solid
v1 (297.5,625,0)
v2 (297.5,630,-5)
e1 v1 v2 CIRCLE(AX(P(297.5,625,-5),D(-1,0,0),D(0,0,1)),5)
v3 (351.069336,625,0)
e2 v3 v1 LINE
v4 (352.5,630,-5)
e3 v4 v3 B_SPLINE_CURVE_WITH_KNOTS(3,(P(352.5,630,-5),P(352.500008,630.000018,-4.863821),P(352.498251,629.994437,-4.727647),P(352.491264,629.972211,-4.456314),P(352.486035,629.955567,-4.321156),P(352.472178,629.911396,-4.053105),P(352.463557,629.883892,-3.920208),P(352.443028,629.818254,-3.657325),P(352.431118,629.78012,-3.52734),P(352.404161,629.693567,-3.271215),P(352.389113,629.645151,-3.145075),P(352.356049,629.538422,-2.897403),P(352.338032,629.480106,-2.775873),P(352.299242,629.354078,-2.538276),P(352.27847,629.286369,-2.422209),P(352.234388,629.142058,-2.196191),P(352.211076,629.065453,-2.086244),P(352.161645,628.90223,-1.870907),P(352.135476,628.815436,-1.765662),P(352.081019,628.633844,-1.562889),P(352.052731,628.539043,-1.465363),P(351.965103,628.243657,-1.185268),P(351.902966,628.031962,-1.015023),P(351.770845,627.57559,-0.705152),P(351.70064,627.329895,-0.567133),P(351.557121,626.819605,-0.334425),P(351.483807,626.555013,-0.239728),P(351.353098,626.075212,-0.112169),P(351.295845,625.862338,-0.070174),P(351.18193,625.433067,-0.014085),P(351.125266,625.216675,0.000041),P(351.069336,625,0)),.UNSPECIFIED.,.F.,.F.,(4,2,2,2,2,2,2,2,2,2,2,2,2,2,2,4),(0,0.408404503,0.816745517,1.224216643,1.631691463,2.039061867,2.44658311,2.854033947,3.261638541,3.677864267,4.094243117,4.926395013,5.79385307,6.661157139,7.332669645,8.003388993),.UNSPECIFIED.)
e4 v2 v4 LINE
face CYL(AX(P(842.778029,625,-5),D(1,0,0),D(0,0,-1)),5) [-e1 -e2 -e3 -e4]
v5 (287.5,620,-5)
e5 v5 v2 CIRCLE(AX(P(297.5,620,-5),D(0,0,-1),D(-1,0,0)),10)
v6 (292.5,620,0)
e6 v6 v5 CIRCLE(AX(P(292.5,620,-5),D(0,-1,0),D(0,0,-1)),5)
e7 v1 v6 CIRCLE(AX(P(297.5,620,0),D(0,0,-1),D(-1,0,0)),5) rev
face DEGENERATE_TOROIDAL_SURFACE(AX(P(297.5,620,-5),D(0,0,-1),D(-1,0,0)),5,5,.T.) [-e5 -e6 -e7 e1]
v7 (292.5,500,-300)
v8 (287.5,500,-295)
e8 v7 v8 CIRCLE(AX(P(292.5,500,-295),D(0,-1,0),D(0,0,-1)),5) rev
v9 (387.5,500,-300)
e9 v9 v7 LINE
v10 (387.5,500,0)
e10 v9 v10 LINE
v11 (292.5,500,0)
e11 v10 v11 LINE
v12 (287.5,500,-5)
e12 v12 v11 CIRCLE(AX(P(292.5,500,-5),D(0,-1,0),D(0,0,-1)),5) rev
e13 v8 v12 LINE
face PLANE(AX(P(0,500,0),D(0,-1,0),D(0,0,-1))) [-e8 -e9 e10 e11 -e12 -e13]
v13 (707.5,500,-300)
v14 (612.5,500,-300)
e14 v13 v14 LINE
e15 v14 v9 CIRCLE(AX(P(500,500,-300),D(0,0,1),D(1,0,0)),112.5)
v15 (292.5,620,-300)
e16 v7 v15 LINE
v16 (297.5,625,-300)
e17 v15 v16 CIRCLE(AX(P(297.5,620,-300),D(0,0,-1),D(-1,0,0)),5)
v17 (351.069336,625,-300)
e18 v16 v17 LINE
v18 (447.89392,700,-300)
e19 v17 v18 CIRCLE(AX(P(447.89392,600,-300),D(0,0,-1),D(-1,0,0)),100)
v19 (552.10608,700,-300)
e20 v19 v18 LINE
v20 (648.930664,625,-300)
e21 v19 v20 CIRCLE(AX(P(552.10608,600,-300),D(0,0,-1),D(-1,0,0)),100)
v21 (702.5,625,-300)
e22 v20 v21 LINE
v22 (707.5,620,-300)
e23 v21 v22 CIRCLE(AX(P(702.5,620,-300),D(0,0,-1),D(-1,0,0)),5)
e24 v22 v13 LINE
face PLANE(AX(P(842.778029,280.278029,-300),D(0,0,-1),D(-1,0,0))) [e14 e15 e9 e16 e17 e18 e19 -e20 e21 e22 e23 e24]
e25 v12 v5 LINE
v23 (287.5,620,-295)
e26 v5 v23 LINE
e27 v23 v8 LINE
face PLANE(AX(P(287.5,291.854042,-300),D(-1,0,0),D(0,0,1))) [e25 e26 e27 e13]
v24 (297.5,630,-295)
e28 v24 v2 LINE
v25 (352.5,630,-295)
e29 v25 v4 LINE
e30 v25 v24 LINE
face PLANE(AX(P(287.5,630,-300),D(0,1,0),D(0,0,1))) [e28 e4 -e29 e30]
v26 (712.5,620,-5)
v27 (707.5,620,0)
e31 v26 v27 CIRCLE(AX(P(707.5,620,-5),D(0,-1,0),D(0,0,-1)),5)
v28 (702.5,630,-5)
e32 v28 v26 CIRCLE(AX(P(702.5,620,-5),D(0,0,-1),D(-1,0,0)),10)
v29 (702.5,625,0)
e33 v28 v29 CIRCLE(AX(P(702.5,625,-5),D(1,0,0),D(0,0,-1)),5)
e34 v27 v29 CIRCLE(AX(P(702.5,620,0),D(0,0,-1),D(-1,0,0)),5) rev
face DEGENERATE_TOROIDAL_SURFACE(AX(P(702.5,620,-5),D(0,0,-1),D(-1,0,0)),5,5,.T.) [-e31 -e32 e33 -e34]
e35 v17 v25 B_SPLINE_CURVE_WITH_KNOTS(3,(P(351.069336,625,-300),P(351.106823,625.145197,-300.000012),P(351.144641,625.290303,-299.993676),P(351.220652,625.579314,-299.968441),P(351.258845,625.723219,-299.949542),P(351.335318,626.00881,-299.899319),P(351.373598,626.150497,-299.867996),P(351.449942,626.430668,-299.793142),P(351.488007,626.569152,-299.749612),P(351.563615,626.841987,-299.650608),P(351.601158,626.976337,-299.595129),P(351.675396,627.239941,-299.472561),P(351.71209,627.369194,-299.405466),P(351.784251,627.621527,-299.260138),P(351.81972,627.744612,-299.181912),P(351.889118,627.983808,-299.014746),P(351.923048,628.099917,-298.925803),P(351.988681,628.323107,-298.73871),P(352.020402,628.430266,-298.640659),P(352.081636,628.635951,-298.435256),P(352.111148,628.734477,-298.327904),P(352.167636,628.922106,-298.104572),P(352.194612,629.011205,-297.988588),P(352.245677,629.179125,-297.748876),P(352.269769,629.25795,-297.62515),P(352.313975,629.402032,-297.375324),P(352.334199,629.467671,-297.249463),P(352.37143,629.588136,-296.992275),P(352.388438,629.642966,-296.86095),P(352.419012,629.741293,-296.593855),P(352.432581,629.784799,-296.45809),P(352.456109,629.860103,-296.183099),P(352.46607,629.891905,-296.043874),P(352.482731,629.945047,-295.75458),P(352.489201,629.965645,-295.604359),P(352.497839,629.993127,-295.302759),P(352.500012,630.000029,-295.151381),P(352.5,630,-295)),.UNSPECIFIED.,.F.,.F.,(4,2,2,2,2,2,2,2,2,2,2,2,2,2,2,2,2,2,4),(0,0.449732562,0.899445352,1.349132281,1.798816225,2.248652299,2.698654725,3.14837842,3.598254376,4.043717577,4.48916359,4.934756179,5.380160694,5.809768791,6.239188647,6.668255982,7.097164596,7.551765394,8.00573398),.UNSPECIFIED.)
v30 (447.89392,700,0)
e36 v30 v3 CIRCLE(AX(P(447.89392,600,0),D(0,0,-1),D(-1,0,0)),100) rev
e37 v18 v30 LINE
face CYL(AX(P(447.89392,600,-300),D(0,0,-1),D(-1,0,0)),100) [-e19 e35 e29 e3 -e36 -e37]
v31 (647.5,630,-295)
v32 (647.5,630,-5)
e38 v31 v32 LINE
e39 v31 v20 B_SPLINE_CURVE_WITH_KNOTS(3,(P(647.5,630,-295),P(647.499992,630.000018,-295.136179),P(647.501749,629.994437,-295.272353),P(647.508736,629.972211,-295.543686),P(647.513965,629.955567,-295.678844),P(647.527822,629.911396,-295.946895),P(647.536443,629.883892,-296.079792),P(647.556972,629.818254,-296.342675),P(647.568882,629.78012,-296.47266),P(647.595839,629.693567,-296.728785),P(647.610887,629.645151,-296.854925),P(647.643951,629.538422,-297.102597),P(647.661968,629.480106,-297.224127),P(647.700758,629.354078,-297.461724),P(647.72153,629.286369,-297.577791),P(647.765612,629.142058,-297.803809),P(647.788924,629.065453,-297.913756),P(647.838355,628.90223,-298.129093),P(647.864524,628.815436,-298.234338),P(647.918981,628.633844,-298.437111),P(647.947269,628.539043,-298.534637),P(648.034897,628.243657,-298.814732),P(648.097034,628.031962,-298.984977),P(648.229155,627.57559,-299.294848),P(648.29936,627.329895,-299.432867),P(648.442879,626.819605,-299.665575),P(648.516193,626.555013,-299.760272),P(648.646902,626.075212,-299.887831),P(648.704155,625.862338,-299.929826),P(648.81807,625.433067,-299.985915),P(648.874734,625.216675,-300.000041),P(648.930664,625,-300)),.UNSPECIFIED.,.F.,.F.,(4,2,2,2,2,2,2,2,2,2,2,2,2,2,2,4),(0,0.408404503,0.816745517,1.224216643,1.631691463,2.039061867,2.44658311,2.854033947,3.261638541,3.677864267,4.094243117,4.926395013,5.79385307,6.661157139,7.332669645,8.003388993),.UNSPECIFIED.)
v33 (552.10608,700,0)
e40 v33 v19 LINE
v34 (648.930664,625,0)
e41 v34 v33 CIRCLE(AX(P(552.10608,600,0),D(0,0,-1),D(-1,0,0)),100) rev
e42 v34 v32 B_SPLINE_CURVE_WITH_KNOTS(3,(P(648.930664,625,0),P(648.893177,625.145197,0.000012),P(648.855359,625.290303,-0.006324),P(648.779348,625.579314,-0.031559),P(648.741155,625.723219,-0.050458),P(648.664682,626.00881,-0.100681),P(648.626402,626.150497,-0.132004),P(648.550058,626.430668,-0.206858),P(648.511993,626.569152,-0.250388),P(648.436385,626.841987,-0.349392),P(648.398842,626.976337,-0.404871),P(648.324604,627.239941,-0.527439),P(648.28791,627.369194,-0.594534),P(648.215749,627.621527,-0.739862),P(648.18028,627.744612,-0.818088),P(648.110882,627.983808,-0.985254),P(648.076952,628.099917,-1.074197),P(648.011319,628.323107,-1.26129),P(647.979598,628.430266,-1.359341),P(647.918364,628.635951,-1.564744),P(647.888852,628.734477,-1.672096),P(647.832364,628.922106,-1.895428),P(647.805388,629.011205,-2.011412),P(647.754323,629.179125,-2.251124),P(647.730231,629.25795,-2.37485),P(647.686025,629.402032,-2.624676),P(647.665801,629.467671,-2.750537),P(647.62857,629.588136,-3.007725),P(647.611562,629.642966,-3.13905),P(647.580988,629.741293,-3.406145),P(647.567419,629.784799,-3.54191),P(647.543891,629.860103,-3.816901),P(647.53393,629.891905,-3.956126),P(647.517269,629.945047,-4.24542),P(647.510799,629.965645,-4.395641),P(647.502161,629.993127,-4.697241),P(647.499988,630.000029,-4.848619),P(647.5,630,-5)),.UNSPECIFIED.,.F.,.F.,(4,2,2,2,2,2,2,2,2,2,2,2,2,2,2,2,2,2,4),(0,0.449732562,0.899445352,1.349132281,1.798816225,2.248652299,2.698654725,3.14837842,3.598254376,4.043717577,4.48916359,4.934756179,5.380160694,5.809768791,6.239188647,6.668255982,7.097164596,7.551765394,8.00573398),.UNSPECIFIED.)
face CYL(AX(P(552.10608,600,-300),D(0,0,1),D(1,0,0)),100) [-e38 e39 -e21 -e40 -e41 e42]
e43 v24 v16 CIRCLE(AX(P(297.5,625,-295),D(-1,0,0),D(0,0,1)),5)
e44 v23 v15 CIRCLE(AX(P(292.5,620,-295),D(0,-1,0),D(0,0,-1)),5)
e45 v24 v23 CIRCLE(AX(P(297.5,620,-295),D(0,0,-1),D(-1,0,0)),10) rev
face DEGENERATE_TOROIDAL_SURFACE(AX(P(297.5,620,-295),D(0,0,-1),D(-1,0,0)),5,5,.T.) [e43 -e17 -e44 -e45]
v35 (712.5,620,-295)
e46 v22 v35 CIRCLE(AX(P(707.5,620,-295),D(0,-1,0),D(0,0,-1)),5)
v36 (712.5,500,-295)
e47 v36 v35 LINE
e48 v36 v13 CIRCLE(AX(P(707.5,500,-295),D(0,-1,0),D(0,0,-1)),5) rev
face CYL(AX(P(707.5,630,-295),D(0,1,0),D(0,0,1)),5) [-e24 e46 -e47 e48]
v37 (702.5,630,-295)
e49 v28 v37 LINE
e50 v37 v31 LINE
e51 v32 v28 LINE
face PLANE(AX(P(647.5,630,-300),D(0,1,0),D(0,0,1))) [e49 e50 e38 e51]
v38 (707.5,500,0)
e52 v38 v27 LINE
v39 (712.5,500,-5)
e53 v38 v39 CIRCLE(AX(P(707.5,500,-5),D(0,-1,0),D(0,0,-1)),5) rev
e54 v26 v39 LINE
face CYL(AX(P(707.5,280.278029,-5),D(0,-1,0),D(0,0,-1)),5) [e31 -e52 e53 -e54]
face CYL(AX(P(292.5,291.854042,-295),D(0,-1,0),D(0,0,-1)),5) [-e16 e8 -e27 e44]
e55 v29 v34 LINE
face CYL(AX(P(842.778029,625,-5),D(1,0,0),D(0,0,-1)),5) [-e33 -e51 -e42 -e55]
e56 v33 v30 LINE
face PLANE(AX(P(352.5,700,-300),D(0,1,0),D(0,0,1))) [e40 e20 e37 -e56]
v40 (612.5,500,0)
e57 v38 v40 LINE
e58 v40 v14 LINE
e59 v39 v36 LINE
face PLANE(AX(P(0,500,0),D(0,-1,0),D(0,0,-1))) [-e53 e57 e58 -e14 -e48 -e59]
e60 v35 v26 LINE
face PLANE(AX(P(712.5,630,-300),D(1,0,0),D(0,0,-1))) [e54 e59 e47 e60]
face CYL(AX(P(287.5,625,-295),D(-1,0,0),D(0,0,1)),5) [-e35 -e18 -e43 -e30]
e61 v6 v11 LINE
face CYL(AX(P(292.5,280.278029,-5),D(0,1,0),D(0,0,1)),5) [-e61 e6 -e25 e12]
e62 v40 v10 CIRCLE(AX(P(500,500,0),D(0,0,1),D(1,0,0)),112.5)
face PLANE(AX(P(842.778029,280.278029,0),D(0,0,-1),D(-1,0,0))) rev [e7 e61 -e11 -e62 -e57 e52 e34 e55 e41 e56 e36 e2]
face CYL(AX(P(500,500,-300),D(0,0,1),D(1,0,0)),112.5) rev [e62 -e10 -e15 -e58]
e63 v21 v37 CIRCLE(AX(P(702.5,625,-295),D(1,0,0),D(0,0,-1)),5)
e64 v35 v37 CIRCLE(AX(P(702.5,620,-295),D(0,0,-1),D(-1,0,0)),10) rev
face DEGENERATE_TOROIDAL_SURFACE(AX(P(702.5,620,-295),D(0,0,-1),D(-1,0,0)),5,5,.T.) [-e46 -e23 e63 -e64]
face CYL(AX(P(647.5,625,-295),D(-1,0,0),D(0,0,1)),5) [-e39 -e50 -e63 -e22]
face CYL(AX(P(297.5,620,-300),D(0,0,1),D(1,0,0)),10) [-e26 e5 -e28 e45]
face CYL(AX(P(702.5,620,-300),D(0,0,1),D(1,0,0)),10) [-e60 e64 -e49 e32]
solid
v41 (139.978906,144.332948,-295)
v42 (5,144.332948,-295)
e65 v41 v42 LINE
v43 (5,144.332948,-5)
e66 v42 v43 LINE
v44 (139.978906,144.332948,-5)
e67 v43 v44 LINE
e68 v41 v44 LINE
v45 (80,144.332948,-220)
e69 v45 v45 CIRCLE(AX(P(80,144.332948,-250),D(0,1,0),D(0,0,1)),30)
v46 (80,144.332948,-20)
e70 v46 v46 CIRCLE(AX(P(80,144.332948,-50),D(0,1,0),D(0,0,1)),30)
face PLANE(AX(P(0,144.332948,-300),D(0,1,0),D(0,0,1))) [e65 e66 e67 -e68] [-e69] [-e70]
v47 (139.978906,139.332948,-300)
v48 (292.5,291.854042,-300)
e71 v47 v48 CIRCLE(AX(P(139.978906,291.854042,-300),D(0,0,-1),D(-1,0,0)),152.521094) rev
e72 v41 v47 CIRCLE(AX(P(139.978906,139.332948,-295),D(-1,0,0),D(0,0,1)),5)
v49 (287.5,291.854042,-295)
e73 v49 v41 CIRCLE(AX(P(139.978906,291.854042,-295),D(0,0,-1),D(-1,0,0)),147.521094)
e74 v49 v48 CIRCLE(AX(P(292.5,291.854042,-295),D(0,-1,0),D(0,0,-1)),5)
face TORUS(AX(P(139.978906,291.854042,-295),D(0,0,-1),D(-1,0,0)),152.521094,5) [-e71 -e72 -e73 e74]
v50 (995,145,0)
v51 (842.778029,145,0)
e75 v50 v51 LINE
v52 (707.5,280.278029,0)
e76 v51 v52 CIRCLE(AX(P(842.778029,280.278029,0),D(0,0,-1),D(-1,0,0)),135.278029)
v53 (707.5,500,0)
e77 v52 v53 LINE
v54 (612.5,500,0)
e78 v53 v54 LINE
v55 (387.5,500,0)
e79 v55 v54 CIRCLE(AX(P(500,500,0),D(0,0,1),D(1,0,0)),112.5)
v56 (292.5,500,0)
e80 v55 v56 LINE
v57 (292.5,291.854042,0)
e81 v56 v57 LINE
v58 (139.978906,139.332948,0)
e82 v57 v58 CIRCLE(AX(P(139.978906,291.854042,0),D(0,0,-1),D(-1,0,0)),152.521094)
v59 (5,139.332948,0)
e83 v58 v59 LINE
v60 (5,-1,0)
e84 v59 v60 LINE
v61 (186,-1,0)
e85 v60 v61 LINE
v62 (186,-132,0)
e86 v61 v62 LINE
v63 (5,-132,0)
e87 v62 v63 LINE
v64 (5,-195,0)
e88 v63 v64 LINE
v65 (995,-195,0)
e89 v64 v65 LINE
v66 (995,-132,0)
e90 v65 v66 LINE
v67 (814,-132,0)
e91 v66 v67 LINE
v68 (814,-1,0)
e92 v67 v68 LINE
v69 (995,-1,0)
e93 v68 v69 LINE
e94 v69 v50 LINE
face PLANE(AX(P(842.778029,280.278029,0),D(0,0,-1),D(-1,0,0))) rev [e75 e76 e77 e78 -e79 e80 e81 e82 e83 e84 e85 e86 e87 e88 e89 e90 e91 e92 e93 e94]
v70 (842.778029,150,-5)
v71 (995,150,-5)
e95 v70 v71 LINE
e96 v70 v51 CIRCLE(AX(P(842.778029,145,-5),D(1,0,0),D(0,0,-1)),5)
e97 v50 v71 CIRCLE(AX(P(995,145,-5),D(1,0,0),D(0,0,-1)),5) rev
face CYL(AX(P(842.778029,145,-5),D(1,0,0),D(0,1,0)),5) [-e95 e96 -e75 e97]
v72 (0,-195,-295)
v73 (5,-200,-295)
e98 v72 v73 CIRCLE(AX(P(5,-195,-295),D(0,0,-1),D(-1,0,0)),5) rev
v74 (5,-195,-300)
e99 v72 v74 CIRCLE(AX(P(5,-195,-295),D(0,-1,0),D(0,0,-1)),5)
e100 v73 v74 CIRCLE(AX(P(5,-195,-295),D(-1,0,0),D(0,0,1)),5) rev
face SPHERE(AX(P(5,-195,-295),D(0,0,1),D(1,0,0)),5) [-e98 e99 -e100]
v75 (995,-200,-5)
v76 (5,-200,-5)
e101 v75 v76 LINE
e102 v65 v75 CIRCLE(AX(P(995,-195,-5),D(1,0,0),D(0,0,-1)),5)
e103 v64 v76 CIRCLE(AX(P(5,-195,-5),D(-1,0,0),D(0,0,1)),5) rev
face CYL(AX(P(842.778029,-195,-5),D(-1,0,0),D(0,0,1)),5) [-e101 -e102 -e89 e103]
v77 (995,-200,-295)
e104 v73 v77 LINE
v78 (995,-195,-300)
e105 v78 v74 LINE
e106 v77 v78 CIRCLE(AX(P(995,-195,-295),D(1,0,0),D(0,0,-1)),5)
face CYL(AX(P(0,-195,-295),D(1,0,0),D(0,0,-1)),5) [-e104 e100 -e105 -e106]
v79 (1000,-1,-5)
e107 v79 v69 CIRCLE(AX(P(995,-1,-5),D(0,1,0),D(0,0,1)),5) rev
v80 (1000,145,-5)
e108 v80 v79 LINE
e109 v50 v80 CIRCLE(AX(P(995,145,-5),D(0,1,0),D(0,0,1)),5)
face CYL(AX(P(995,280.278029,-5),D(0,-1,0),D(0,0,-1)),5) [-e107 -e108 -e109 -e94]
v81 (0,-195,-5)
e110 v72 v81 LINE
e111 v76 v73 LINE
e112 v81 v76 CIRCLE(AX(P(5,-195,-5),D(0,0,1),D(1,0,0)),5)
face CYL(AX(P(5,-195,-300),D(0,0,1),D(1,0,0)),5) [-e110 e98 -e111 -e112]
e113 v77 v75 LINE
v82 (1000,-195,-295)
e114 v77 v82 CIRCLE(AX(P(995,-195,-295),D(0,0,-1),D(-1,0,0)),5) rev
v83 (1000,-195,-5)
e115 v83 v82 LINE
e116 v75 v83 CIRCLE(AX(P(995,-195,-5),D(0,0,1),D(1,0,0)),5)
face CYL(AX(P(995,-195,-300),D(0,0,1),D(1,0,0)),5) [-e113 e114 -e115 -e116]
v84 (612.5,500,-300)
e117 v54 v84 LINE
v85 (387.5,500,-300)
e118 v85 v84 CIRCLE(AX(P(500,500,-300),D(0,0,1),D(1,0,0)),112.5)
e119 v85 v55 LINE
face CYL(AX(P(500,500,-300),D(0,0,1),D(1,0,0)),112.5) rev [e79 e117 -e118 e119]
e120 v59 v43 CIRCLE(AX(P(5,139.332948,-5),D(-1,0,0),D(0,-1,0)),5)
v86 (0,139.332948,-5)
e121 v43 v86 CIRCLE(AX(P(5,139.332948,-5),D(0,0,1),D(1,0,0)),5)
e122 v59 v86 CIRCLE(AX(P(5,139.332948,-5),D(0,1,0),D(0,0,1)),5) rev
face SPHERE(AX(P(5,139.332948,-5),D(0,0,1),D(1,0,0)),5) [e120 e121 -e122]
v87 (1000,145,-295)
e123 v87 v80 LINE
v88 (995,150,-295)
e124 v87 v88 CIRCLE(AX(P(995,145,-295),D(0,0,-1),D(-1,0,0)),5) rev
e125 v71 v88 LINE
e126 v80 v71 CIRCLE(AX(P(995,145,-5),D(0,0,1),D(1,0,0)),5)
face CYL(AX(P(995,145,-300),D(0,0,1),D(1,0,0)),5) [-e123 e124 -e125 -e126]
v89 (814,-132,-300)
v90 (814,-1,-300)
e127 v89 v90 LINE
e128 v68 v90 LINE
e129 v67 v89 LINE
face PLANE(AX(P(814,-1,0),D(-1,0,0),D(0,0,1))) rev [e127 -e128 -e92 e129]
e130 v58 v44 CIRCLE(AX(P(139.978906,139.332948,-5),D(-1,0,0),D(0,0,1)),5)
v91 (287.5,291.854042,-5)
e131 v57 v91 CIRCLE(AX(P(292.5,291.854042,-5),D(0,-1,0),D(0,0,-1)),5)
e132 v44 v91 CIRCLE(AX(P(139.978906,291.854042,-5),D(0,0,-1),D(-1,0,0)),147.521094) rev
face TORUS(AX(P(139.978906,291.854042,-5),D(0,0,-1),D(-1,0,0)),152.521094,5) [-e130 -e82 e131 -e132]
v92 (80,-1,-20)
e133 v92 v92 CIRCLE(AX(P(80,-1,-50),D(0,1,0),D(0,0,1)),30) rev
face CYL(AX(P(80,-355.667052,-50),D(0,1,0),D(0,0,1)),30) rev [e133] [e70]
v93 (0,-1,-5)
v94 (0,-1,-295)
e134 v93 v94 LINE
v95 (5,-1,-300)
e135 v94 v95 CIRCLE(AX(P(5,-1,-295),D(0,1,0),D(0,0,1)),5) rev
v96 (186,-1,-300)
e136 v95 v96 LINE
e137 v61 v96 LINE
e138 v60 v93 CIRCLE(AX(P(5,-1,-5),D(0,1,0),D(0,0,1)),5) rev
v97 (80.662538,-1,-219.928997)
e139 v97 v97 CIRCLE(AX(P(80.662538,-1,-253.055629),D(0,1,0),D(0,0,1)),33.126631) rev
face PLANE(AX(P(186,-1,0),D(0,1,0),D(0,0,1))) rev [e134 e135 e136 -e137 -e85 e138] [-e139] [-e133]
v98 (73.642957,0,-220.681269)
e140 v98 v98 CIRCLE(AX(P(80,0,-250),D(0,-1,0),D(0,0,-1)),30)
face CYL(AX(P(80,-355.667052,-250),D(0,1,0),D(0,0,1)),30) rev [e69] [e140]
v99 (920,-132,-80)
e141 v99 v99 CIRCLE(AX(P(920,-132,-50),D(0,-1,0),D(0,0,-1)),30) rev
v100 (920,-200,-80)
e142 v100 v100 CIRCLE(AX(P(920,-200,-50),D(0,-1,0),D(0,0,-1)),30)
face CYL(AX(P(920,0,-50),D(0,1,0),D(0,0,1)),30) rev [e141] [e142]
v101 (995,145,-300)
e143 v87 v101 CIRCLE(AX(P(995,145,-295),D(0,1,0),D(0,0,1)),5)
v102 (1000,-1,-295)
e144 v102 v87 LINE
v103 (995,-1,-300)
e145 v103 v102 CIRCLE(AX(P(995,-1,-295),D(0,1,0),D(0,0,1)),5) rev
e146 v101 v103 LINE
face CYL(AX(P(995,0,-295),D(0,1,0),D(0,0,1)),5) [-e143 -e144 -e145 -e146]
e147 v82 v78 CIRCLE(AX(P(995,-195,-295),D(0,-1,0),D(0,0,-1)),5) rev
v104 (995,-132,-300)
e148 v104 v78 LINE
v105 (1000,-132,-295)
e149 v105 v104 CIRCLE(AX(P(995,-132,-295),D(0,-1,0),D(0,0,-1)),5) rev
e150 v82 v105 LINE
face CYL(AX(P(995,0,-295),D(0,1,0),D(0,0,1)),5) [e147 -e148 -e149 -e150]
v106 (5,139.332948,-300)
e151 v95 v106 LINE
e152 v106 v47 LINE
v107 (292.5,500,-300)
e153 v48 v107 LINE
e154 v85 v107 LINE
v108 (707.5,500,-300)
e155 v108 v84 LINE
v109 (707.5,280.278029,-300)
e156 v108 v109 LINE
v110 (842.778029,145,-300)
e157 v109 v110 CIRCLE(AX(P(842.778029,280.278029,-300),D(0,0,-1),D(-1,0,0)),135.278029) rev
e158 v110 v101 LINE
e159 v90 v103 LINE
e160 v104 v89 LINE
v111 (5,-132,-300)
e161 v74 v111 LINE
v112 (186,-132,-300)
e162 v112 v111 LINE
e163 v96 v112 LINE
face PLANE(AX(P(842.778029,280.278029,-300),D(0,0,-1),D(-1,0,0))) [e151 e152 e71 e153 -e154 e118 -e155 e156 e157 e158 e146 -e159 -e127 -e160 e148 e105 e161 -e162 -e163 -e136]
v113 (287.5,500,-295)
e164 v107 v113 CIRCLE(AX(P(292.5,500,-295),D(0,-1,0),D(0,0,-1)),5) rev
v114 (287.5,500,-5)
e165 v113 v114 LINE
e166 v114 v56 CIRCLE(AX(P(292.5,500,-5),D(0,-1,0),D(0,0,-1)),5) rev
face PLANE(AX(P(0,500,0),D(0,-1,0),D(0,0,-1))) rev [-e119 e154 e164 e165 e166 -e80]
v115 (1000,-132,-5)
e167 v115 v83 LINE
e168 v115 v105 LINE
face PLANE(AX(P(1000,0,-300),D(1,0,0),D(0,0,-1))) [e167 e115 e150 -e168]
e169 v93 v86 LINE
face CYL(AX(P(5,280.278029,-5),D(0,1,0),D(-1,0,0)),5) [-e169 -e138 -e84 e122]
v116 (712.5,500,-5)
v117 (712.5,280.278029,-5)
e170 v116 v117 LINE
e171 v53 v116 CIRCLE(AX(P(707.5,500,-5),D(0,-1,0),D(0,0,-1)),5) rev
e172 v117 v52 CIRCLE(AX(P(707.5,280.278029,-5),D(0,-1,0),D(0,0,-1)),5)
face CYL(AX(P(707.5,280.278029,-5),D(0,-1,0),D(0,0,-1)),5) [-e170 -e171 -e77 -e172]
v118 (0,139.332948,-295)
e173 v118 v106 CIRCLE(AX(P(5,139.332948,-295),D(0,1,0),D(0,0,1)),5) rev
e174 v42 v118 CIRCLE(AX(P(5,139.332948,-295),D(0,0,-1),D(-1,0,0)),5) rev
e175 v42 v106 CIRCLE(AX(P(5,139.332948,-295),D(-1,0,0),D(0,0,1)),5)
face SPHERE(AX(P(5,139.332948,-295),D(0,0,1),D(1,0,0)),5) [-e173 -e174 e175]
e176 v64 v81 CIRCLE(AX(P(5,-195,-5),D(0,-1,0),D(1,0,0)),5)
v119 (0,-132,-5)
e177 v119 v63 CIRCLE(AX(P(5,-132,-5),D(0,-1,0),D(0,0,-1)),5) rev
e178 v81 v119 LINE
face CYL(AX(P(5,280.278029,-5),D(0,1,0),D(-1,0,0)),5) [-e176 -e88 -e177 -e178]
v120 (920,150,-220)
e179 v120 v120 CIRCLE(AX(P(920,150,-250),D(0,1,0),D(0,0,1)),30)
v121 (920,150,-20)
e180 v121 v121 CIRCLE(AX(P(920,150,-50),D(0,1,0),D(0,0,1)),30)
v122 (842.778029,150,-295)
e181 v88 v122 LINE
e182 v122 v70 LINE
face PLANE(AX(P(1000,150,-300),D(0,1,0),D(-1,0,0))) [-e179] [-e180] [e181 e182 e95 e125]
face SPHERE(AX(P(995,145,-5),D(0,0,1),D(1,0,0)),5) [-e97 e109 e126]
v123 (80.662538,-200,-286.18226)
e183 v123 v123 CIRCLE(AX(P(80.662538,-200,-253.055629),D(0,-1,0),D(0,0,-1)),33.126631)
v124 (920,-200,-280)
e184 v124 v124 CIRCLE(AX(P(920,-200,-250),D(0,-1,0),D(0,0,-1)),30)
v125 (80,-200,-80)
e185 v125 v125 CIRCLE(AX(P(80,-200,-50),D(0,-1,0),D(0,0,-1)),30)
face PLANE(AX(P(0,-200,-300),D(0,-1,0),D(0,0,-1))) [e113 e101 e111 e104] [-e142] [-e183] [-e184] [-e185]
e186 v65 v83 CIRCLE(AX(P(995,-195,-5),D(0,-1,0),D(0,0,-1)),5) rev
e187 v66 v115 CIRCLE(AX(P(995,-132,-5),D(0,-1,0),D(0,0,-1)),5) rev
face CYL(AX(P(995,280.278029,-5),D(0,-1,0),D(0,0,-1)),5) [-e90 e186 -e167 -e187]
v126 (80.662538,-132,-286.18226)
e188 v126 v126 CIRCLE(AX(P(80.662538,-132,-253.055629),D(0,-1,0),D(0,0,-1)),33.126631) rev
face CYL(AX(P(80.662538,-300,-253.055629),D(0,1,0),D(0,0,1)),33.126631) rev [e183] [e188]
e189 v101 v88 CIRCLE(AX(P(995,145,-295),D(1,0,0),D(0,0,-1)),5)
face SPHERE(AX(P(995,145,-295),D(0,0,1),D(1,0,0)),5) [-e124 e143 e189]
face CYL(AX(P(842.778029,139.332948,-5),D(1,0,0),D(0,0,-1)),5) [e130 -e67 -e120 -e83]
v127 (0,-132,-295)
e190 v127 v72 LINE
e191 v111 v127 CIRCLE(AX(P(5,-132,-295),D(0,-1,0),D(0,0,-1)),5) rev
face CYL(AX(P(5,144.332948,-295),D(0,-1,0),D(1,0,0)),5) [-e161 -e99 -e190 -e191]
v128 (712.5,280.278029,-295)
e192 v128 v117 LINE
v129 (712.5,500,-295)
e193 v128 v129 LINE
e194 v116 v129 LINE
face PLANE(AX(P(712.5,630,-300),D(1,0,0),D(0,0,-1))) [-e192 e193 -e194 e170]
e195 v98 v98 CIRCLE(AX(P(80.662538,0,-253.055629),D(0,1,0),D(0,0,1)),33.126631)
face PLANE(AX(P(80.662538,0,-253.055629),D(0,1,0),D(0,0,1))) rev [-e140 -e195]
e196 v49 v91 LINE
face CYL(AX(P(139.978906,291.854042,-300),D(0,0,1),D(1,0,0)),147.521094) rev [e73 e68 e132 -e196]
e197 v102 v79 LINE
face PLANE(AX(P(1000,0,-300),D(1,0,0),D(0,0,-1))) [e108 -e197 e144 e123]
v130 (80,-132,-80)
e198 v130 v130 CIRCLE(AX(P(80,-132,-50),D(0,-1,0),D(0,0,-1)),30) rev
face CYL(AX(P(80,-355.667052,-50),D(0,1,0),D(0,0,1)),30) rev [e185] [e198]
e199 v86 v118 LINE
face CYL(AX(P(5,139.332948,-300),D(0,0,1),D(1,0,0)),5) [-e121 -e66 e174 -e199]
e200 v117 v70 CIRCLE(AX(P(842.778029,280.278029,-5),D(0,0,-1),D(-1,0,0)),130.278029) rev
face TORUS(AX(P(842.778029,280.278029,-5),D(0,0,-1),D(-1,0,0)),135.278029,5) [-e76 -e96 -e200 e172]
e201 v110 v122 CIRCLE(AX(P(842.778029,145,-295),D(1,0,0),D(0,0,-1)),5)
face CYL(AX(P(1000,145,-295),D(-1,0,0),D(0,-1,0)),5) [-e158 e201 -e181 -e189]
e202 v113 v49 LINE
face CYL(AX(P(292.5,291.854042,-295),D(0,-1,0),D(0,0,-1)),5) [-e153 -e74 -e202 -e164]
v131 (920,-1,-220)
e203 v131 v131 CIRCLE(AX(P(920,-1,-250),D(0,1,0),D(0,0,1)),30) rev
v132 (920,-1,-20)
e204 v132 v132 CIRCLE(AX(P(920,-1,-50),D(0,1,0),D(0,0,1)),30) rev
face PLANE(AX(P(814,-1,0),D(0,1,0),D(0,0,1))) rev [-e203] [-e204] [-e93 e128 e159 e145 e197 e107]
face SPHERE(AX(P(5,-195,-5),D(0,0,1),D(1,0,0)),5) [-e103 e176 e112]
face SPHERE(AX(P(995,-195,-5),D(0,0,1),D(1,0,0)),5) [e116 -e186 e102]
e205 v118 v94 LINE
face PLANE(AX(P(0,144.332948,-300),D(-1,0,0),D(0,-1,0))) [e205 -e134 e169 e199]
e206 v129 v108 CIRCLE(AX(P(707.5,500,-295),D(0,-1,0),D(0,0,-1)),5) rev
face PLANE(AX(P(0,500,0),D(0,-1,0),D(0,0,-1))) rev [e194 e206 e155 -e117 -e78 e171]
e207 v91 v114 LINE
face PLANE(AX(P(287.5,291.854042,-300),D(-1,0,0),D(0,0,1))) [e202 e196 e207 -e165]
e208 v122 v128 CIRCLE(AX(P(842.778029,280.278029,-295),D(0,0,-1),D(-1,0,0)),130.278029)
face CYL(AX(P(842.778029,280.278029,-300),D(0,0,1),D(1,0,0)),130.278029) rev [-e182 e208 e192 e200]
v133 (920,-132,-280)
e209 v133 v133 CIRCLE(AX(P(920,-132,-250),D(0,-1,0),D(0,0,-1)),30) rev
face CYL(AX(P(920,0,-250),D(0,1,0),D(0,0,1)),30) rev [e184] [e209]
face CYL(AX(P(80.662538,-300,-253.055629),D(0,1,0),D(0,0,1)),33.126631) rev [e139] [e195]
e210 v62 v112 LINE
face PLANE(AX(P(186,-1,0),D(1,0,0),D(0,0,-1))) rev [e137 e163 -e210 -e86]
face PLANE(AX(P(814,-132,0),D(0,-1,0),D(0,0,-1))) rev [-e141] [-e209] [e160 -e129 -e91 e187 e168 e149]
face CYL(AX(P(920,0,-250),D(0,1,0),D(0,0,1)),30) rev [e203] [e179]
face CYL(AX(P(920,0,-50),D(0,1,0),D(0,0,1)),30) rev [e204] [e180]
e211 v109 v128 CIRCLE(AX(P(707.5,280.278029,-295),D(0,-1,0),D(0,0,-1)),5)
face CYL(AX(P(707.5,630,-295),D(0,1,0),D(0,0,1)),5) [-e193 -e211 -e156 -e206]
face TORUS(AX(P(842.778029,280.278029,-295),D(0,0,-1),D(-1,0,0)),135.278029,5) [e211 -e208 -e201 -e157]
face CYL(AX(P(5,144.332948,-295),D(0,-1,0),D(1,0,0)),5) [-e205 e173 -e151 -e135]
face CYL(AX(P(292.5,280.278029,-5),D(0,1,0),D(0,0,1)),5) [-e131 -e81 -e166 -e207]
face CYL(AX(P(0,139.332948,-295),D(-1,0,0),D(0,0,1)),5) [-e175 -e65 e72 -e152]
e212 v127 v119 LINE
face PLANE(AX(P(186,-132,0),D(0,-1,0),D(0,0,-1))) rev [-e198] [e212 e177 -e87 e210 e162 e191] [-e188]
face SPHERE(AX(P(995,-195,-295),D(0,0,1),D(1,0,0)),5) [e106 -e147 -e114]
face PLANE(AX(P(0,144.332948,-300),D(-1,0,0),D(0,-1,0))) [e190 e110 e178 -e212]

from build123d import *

# Parameters (mm, degrees)
ESQUISSE1_R             = 112.5
BOSS_EXTRU_1_DEPTH      = 300
ESQUISSE2_R             = 30
ENL_V_MAT_EXTRU_1_DEPTH = 500
CONG_3_R                = 100
CONG_4_R                = 10
ESQUISSE3_R             = 30
ENL_V_MAT_EXTRU_2_DEPTH = 1181.042372121
ESQUISSE6_W             = 1000
ESQUISSE6_H             = 200
BOSS_EXTRU_2_DEPTH      = 300
ESQUISSE7_R             = 33.126631207
ESQUISSE7_R_2           = 30
ENL_V_MAT_EXTRU_4_DEPTH = 300
CONG_6_R                = 5
ESQUISSE12_W            = 450.728813559
ESQUISSE12_H            = 131
ENL_V_MAT_EXTRU_5_DEPTH = 1257.980509077


with BuildPart() as part:
    # Esquisse1 → Boss.-Extru.1 (new body)
    with BuildSketch(Plane.XY):
        with BuildLine():
            Line((0, 0), (1000, 0))
            Line((1000, 0), (1000, 150))
            Line((1000, 150), (842.778028845, 150))
            ThreePointArc((842.778028845, 150), (750.657551209, 188.157551209), (712.5, 280.278028845))
            Line((712.5, 280.278028845), (712.5, 375))
            Line((712.5, 375), (712.5, 630))
            Line((712.5, 630), (647.5, 630))
            Line((647.5, 630), (647.5, 700))
            Line((647.5, 700), (352.5, 700))
            Line((352.5, 700), (352.5, 630))
            Line((352.5, 630), (287.5, 630))
            Line((287.5, 630), (287.5, 374.917655942))
            Line((287.5, 374.917655942), (287.5, 291.854042173))
            ThreePointArc((287.5, 291.854042173), (244.292071963, 187.540876304), (139.978906094, 144.332948267))
            Line((139.978906094, 144.332948267), (0, 144.332948267))
            Line((0, 144.332948267), (0, 0))
        make_face()
        with Locations((500, 500)):
            Circle(ESQUISSE1_R, mode=Mode.SUBTRACT)
    extrude(amount=-BOSS_EXTRU_1_DEPTH)

    # Esquisse2 → Enlèv. mat.-Extru.1 (cut)
    with BuildSketch(Plane(origin=(0, 144.332948267, 0), x_dir=(1, 0, 0), z_dir=(0, 1, 0))):
        with Locations(Location((80, 250, 0), (0, 0, 270))):
            Circle(ESQUISSE2_R)
        with Locations(Location((80, 50, 0), (0, 0, 270))):
            Circle(ESQUISSE2_R)
    extrude(amount=-ENL_V_MAT_EXTRU_1_DEPTH, mode=Mode.SUBTRACT)

    # Congé3
    # the kernel refuses this fillet: 100 mm, written as the material it takes off along each edge
    with BuildSketch(Plane(origin=(352.5, 700, 238.484800354), x_dir=(1, 0, 0), z_dir=(0, 0, -1))) as cong_3_piece_1:
        with BuildLine():
            CenterArc((95.393920142, 100), CONG_3_R, 197.457603124, 72.542396876)
            Line((0, 70), (-1.907878403, 69.4))
            ThreePointArc((-1.907878403, 69.4), (-2, 35), (-2, 0))
            Line((-2, 0), (0, -2))
            Line((0, -2), (95.393920142, -2))
            Line((95.393920142, -2), (95.393920142, 0))
        make_face()
    extrude(amount=776.969600708, mode=Mode.SUBTRACT)
    with BuildSketch(Plane(origin=(647.5, 700, 238.484800354), x_dir=(0, -1, 0), z_dir=(0, 0, -1))) as cong_3_piece_2:
        with BuildLine():
            CenterArc((100, 95.393920142), CONG_3_R, 180, 72.542396876)
            Line((0, 95.393920142), (-2, 95.393920142))
            Line((-2, 95.393920142), (-2, 0))
            Line((-2, 0), (0, -2))
            ThreePointArc((0, -2), (35, -2), (69.4, -1.907878403))
            Line((69.4, -1.907878403), (70, 0))
        make_face()
    extrude(amount=776.969600708, mode=Mode.SUBTRACT)

    # Congé4
    cong_4_edges = [part.edges().sort_by_distance(p)[0] for p in [
        (287.5, 630, -150),
        (712.5, 630, -150),
    ]]
    fillet(cong_4_edges, radius=CONG_4_R)

    # Esquisse3 → Enlèv. mat.-Extru.2 (cut, through all)
    with BuildSketch(Plane(origin=(0, 150, 0), x_dir=(1, 0, 0), z_dir=(0, 1, 0))):
        with Locations(Location((920, 250, 0), (0, 0, 270))):
            Circle(ESQUISSE3_R)
        with Locations(Location((920, 50, 0), (0, 0, 270))):
            Circle(ESQUISSE3_R)
    extrude(amount=-ENL_V_MAT_EXTRU_2_DEPTH, mode=Mode.SUBTRACT)

    # Esquisse6 → Boss.-Extru.2 (add)
    with BuildSketch(Plane.XY):
        with Locations((500, -100)):
            Rectangle(ESQUISSE6_W, ESQUISSE6_H)
    extrude(amount=-BOSS_EXTRU_2_DEPTH)

    # Esquisse7 → Enlèv. mat.-Extru.4 (cut)
    with BuildSketch(Plane(origin=(0, 0, 0), x_dir=(1, 0, 0), z_dir=(0, 1, 0))):
        with Locations(Location((80.66253765, 253.05562867, 0), (0, 0, 257.766195301))):
            Circle(ESQUISSE7_R)
        with Locations(Location((80, 50, 0), (0, 0, 270))):
            Circle(ESQUISSE7_R_2)
        with Locations(Location((920, 250, 0), (0, 0, 270))):
            Circle(ESQUISSE7_R_2)
        with Locations(Location((920, 50, 0), (0, 0, 270))):
            Circle(ESQUISSE7_R_2)
    extrude(amount=-ENL_V_MAT_EXTRU_4_DEPTH, mode=Mode.SUBTRACT)

    # Congé6
    cong_6_edges = [part.edges().sort_by_distance(p)[0] for p in [
        (1000, -25, -300),
        (69.989453047, 144.332948267, 0),
        (244.292071963, 187.540876304, 0),
        (921.389014422, 150, -300),
        (325, 630, 0),
        (712.5, 450.139014422, 0),
        (750.657551209, 188.157551209, 0),
        (921.389014422, 150, 0),
        (750.657551209, 188.157551209, -300),
        (1000, -25, 0),
        (0, -27.833525867, 0),
        (712.5, 450.139014422, -300),
        (0, 144.332948267, -150),
        (1000, 150, -150),
        (325, 630, -300),
        (0, -27.833525867, -300),
        (244.292071963, 187.540876304, -300),
        (69.989453047, 144.332948267, -300),
        (287.5, 455.927021086, 0),
        (675, 630, 0),
        (709.571067812, 627.071067812, 0),
        (290.428932188, 627.071067812, 0),
        (287.5, 455.927021086, -300),
        (675, 630, -300),
        (709.571067812, 627.071067812, -300),
        (290.428932188, 627.071067812, -300),
        (500, -200, -300),
        (1000, -200, -150),
        (0, -200, -150),
        (500, -200, 0),
    ]]
    fillet(cong_6_edges, radius=CONG_6_R)


with BuildPart() as body_2:
    # Fractionner1: the piece on the far side of the plane
    add(part.part)
    split(bisect_by=Plane(origin=(0, 500, 0), x_dir=(0, 0, -1), z_dir=(0, -1, 0)), keep=Keep.BOTTOM)


with BuildPart() as part_1:
    add(part.part)

    # Fractionner1
    split(bisect_by=Plane(origin=(0, 500, 0), x_dir=(0, 0, -1), z_dir=(0, -1, 0)), keep=Keep.TOP)

    # Esquisse12 → Enlèv. mat.-Extru.5 (cut, through all)
    with BuildSketch(Plane(origin=(0, 0, -300), x_dir=(-1, 0, 0), z_dir=(0, 0, -1))):
        with Locations((39.36440678, -66.5)):
            Rectangle(ESQUISSE12_W, ESQUISSE12_H)
        with Locations((-1039.36440678, -66.5)):
            Rectangle(ESQUISSE12_W, ESQUISSE12_H)
    extrude(amount=-ENL_V_MAT_EXTRU_5_DEPTH, mode=Mode.SUBTRACT)


solid = Compound([body_2.part, part_1.part])
